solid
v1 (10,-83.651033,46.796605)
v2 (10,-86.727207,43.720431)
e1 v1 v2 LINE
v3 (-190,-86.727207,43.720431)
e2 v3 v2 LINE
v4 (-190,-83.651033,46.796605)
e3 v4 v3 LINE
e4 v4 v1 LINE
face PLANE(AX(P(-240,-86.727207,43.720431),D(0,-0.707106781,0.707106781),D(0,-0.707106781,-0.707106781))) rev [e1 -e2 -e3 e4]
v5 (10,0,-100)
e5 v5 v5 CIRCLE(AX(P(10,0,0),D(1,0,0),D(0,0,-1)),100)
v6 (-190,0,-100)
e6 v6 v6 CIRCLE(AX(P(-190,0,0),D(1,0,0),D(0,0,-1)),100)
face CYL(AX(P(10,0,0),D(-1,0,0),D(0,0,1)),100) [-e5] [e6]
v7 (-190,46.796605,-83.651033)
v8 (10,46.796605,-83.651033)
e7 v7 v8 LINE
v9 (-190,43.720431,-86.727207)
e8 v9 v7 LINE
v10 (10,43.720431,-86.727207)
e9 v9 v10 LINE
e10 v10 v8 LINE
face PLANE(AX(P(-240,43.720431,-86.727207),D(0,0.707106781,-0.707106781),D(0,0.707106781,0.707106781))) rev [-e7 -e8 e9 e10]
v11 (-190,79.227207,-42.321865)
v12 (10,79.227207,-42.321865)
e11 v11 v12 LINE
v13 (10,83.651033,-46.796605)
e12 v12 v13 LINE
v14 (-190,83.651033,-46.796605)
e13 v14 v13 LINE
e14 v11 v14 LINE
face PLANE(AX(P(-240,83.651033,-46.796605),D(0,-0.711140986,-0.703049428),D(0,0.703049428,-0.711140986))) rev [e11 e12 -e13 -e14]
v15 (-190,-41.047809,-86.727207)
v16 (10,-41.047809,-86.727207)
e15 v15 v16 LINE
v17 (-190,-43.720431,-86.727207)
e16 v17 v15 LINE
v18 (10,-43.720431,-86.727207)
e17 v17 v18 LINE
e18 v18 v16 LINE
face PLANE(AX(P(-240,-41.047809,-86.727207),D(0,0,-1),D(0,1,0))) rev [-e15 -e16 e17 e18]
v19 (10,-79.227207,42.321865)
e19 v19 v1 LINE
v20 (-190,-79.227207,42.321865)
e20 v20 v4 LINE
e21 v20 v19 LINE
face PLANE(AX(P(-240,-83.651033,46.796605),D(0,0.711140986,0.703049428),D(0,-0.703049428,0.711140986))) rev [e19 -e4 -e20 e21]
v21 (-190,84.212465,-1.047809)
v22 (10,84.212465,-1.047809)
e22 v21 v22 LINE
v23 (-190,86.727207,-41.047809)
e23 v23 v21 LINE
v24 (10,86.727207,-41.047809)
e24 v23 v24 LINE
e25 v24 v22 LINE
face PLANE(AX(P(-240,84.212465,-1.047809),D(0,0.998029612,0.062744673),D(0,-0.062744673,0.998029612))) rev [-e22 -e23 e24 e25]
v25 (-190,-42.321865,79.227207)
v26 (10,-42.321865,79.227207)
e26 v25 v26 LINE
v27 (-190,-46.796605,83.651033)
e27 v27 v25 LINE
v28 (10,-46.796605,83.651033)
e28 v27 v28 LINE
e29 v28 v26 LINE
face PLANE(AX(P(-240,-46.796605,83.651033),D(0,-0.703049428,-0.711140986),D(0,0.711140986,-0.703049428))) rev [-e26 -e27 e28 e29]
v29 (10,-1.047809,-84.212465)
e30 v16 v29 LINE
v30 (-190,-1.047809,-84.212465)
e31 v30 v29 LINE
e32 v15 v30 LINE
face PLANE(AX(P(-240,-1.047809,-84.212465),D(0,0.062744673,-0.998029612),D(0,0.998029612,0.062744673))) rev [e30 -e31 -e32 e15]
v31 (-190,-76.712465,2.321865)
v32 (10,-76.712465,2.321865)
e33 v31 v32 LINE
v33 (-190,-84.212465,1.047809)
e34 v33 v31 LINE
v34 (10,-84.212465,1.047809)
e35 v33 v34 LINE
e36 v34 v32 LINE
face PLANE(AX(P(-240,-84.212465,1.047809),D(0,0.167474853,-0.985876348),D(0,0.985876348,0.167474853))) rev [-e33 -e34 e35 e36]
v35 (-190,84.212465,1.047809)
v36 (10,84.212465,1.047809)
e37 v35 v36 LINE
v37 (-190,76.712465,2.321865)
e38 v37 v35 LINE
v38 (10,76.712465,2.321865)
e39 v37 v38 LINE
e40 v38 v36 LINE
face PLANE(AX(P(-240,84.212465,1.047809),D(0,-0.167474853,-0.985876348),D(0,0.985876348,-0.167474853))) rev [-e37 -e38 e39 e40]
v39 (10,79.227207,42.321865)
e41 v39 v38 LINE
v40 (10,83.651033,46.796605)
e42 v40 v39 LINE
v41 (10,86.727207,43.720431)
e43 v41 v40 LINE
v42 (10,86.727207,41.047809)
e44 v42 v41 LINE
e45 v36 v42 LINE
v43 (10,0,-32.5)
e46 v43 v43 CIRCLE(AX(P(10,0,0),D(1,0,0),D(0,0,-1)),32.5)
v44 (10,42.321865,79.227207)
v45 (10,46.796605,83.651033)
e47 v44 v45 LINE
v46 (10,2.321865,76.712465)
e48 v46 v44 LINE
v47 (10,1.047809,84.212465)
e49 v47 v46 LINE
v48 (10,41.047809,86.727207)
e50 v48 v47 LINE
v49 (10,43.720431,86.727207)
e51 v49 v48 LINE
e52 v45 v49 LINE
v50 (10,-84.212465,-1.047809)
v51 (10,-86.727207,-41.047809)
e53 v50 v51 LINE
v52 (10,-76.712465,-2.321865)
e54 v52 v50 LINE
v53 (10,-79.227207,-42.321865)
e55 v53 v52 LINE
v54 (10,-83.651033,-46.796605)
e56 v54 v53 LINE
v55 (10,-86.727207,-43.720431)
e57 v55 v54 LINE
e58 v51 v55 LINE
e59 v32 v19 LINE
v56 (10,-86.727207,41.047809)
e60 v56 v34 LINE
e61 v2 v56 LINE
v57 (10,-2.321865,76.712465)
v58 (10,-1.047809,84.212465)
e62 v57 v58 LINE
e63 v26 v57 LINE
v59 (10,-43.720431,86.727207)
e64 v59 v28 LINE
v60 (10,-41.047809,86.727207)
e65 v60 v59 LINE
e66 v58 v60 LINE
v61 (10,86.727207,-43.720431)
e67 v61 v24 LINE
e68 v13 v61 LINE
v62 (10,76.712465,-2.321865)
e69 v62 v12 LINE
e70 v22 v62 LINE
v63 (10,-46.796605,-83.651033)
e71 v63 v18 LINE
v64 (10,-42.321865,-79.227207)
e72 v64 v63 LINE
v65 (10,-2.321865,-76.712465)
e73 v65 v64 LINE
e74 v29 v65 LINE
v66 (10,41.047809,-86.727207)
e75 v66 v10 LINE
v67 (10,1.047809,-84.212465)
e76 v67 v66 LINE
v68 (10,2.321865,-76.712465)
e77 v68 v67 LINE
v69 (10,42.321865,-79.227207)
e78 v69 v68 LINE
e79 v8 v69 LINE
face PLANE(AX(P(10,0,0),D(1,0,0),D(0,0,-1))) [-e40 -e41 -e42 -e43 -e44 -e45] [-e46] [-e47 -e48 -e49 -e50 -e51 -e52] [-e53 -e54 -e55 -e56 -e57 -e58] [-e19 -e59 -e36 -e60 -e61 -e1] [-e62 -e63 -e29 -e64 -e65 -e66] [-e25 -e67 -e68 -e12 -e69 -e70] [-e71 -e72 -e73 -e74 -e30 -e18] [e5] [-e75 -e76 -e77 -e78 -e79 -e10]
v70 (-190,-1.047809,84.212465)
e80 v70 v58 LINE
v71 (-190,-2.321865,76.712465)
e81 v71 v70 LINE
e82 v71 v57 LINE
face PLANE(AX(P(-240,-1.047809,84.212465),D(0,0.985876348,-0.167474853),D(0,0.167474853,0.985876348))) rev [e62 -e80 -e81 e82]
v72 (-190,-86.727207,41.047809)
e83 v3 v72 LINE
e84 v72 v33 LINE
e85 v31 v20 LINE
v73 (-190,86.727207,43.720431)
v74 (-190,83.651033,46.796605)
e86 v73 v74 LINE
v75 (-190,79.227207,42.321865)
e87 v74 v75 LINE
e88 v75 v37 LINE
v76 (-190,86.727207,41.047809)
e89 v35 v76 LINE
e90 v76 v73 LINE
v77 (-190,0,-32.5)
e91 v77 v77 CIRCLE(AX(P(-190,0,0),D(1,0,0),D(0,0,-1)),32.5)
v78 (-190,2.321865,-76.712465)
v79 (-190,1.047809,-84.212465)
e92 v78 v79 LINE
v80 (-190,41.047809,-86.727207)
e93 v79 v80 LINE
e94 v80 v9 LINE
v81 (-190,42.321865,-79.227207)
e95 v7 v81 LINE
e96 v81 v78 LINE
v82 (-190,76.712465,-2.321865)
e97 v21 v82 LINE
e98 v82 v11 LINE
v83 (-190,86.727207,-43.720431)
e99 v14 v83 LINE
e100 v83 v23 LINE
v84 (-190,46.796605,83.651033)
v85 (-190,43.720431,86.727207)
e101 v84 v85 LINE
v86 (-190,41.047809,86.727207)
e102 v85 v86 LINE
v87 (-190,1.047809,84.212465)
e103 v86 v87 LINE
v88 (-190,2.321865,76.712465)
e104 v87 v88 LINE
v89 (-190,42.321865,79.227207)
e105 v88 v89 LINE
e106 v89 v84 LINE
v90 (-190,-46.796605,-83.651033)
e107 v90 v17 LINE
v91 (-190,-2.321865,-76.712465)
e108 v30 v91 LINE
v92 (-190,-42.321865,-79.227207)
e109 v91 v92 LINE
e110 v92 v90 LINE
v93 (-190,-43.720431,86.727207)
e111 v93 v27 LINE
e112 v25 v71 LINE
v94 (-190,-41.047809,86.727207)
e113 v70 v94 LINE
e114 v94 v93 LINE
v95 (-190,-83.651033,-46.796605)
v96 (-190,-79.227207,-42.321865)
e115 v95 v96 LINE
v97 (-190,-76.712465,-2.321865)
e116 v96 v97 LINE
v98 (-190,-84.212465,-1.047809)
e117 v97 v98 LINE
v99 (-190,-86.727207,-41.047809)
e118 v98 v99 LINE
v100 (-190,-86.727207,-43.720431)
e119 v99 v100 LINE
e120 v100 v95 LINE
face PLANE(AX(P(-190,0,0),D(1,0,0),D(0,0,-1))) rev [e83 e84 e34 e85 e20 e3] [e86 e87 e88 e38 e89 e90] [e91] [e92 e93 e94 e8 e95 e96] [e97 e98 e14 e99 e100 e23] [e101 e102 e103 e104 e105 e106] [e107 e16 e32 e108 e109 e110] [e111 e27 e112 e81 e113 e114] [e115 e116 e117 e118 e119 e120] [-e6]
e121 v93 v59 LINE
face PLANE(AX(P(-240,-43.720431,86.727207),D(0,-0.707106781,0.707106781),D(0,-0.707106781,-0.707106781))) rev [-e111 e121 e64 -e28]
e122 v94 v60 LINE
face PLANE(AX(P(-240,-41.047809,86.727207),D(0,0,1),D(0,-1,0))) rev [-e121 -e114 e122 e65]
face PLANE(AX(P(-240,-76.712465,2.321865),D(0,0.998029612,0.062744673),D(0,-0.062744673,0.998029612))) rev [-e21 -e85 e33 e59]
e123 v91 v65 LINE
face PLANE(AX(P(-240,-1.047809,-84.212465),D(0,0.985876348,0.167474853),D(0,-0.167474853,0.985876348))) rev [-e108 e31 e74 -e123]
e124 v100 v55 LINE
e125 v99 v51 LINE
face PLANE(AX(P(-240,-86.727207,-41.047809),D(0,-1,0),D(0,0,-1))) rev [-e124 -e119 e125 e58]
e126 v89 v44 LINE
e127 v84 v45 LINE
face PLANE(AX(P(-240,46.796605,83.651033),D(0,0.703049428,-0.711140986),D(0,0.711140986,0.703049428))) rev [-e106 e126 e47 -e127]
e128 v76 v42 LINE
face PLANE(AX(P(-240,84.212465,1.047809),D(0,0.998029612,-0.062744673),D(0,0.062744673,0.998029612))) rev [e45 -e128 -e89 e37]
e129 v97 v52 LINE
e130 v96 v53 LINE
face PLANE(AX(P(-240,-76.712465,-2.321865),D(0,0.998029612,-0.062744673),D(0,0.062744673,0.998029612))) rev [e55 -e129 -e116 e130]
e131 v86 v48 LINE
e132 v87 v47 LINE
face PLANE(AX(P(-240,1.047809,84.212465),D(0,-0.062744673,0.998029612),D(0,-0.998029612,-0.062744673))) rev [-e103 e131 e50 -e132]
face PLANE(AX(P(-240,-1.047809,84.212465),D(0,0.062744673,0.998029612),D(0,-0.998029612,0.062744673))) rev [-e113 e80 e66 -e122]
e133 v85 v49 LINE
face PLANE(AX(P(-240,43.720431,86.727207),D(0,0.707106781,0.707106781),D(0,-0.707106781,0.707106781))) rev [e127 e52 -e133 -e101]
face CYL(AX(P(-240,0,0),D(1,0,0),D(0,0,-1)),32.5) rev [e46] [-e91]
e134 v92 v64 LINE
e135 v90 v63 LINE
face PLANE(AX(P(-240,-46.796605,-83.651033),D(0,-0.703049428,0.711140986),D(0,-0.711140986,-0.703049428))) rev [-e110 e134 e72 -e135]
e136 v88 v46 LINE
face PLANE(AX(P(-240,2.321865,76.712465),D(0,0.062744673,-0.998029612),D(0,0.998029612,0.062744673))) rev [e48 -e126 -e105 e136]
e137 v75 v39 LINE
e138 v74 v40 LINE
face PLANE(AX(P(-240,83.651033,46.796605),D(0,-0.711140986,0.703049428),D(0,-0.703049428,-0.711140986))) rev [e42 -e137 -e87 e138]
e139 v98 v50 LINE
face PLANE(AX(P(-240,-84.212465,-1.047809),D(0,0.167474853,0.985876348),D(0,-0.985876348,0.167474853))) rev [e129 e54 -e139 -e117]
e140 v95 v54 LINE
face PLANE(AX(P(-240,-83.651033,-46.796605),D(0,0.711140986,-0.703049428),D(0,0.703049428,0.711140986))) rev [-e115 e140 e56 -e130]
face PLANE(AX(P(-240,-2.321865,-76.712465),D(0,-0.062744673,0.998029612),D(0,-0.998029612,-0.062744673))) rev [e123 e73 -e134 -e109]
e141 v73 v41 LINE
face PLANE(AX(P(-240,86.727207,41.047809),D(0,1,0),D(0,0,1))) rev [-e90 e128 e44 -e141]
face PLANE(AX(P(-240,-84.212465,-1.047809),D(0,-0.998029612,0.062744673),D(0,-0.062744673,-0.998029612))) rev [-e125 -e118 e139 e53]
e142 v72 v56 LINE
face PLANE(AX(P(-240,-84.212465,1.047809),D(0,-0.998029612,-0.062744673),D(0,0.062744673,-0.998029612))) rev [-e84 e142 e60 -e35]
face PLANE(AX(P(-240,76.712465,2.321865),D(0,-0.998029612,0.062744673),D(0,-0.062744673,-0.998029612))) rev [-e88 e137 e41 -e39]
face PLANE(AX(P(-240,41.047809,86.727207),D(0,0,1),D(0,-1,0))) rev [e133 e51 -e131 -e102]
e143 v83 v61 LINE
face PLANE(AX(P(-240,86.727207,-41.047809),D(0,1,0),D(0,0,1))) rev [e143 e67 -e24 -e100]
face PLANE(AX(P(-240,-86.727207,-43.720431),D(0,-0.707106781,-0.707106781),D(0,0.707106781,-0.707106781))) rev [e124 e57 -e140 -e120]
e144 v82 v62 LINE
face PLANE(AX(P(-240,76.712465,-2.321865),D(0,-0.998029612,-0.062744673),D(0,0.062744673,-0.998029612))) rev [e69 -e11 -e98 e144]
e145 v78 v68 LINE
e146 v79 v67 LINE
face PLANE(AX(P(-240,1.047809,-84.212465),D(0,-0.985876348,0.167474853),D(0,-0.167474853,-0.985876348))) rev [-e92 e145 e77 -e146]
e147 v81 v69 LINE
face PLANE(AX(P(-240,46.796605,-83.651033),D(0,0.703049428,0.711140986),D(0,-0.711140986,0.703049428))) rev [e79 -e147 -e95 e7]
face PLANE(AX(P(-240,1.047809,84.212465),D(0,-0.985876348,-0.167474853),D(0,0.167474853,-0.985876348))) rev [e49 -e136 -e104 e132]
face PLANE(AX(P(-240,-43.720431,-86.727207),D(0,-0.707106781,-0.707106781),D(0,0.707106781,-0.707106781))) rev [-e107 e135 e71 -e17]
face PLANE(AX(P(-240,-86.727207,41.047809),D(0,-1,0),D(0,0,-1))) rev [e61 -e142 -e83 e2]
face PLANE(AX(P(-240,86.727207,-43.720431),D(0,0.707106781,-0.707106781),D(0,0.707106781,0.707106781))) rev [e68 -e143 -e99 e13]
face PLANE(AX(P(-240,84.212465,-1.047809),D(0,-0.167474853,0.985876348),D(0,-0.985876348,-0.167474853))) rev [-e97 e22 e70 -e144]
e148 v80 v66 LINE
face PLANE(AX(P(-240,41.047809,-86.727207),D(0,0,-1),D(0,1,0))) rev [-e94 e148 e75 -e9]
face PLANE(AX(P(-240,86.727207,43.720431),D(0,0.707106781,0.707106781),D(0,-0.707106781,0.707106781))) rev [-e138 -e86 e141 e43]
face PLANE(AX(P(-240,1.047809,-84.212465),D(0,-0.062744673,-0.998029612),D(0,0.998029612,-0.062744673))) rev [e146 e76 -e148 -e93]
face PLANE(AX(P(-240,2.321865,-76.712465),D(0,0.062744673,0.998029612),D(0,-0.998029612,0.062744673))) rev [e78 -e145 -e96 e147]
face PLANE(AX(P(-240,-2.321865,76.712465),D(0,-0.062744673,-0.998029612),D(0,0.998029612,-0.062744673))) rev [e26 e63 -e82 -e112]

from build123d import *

# Parameters (mm, degrees)
SKETCH1_R           = 100
BOSS_EXTRUDE1_DEPTH = 10
SKETCH2_R           = 32.5
CUT_EXTRUDE1_DEPTH  = 250
LPATTERN5_COUNT     = 20
LPATTERN5_PITCH     = 10


with BuildPart() as part:
    # Sketch1 → Boss-Extrude1 (new body)
    with BuildSketch(Plane(origin=(0, 0, 0), x_dir=(0, 0, -1), z_dir=(1, 0, 0))):
        Circle(SKETCH1_R)
    boss_extrude1 = extrude(amount=BOSS_EXTRUDE1_DEPTH)

    # Sketch2 → Cut-Extrude1 (cut)
    with BuildSketch(Plane(origin=(10, 0, 0), x_dir=(0, 0, -1), z_dir=(1, 0, 0))):
        Circle(SKETCH2_R)
        Polygon((1.047809143, 84.212465352), (2.321864858, 76.712465352), (42.321864858, 79.227207296), (46.796605305, 83.651032908), (43.720430917, 86.727207296), (41.047809143, 86.727207296), align=None)
        Polygon((-1.047809143, 84.212465352), (-2.321864858, 76.712465352), (-42.321864858, 79.227207296), (-46.796605305, 83.651032908), (-43.720430917, 86.727207296), (-41.047809143, 86.727207296), align=None)
        Polygon((84.212465352, 1.047809143), (76.712465352, 2.321864858), (79.227207296, 42.321864858), (83.651032908, 46.796605305), (86.727207296, 43.720430917), (86.727207296, 41.047809143), align=None)
        Polygon((84.212465352, -1.047809143), (86.727207296, -41.047809143), (86.727207296, -43.720430917), (83.651032908, -46.796605305), (79.227207296, -42.321864858), (76.712465352, -2.321864858), align=None)
        Polygon((1.047809143, -84.212465352), (2.321864858, -76.712465352), (42.321864858, -79.227207296), (46.796605305, -83.651032908), (43.720430917, -86.727207296), (41.047809143, -86.727207296), align=None)
        Polygon((-1.047809143, -84.212465352), (-41.047809143, -86.727207296), (-43.720430917, -86.727207296), (-46.796605305, -83.651032908), (-42.321864858, -79.227207296), (-2.321864858, -76.712465352), align=None)
        Polygon((-84.212465352, -1.047809143), (-76.712465352, -2.321864858), (-79.227207296, -42.321864858), (-83.651032908, -46.796605305), (-86.727207296, -43.720430917), (-86.727207296, -41.047809143), align=None)
        Polygon((-84.212465352, 1.047809143), (-86.727207296, 41.047809143), (-86.727207296, 43.720430917), (-83.651032908, 46.796605305), (-79.227207296, 42.321864858), (-76.712465352, 2.321864858), align=None)
    cut_extrude1 = extrude(amount=-CUT_EXTRUDE1_DEPTH, mode=Mode.SUBTRACT)

    # LPattern5: Boss-Extrude1, Cut-Extrude1 ×20
    with Locations(*[(-i * LPATTERN5_PITCH, 0, 0) for i in range(1, LPATTERN5_COUNT)]):
        add(boss_extrude1)
        add(cut_extrude1, mode=Mode.SUBTRACT)


solid = part.part
